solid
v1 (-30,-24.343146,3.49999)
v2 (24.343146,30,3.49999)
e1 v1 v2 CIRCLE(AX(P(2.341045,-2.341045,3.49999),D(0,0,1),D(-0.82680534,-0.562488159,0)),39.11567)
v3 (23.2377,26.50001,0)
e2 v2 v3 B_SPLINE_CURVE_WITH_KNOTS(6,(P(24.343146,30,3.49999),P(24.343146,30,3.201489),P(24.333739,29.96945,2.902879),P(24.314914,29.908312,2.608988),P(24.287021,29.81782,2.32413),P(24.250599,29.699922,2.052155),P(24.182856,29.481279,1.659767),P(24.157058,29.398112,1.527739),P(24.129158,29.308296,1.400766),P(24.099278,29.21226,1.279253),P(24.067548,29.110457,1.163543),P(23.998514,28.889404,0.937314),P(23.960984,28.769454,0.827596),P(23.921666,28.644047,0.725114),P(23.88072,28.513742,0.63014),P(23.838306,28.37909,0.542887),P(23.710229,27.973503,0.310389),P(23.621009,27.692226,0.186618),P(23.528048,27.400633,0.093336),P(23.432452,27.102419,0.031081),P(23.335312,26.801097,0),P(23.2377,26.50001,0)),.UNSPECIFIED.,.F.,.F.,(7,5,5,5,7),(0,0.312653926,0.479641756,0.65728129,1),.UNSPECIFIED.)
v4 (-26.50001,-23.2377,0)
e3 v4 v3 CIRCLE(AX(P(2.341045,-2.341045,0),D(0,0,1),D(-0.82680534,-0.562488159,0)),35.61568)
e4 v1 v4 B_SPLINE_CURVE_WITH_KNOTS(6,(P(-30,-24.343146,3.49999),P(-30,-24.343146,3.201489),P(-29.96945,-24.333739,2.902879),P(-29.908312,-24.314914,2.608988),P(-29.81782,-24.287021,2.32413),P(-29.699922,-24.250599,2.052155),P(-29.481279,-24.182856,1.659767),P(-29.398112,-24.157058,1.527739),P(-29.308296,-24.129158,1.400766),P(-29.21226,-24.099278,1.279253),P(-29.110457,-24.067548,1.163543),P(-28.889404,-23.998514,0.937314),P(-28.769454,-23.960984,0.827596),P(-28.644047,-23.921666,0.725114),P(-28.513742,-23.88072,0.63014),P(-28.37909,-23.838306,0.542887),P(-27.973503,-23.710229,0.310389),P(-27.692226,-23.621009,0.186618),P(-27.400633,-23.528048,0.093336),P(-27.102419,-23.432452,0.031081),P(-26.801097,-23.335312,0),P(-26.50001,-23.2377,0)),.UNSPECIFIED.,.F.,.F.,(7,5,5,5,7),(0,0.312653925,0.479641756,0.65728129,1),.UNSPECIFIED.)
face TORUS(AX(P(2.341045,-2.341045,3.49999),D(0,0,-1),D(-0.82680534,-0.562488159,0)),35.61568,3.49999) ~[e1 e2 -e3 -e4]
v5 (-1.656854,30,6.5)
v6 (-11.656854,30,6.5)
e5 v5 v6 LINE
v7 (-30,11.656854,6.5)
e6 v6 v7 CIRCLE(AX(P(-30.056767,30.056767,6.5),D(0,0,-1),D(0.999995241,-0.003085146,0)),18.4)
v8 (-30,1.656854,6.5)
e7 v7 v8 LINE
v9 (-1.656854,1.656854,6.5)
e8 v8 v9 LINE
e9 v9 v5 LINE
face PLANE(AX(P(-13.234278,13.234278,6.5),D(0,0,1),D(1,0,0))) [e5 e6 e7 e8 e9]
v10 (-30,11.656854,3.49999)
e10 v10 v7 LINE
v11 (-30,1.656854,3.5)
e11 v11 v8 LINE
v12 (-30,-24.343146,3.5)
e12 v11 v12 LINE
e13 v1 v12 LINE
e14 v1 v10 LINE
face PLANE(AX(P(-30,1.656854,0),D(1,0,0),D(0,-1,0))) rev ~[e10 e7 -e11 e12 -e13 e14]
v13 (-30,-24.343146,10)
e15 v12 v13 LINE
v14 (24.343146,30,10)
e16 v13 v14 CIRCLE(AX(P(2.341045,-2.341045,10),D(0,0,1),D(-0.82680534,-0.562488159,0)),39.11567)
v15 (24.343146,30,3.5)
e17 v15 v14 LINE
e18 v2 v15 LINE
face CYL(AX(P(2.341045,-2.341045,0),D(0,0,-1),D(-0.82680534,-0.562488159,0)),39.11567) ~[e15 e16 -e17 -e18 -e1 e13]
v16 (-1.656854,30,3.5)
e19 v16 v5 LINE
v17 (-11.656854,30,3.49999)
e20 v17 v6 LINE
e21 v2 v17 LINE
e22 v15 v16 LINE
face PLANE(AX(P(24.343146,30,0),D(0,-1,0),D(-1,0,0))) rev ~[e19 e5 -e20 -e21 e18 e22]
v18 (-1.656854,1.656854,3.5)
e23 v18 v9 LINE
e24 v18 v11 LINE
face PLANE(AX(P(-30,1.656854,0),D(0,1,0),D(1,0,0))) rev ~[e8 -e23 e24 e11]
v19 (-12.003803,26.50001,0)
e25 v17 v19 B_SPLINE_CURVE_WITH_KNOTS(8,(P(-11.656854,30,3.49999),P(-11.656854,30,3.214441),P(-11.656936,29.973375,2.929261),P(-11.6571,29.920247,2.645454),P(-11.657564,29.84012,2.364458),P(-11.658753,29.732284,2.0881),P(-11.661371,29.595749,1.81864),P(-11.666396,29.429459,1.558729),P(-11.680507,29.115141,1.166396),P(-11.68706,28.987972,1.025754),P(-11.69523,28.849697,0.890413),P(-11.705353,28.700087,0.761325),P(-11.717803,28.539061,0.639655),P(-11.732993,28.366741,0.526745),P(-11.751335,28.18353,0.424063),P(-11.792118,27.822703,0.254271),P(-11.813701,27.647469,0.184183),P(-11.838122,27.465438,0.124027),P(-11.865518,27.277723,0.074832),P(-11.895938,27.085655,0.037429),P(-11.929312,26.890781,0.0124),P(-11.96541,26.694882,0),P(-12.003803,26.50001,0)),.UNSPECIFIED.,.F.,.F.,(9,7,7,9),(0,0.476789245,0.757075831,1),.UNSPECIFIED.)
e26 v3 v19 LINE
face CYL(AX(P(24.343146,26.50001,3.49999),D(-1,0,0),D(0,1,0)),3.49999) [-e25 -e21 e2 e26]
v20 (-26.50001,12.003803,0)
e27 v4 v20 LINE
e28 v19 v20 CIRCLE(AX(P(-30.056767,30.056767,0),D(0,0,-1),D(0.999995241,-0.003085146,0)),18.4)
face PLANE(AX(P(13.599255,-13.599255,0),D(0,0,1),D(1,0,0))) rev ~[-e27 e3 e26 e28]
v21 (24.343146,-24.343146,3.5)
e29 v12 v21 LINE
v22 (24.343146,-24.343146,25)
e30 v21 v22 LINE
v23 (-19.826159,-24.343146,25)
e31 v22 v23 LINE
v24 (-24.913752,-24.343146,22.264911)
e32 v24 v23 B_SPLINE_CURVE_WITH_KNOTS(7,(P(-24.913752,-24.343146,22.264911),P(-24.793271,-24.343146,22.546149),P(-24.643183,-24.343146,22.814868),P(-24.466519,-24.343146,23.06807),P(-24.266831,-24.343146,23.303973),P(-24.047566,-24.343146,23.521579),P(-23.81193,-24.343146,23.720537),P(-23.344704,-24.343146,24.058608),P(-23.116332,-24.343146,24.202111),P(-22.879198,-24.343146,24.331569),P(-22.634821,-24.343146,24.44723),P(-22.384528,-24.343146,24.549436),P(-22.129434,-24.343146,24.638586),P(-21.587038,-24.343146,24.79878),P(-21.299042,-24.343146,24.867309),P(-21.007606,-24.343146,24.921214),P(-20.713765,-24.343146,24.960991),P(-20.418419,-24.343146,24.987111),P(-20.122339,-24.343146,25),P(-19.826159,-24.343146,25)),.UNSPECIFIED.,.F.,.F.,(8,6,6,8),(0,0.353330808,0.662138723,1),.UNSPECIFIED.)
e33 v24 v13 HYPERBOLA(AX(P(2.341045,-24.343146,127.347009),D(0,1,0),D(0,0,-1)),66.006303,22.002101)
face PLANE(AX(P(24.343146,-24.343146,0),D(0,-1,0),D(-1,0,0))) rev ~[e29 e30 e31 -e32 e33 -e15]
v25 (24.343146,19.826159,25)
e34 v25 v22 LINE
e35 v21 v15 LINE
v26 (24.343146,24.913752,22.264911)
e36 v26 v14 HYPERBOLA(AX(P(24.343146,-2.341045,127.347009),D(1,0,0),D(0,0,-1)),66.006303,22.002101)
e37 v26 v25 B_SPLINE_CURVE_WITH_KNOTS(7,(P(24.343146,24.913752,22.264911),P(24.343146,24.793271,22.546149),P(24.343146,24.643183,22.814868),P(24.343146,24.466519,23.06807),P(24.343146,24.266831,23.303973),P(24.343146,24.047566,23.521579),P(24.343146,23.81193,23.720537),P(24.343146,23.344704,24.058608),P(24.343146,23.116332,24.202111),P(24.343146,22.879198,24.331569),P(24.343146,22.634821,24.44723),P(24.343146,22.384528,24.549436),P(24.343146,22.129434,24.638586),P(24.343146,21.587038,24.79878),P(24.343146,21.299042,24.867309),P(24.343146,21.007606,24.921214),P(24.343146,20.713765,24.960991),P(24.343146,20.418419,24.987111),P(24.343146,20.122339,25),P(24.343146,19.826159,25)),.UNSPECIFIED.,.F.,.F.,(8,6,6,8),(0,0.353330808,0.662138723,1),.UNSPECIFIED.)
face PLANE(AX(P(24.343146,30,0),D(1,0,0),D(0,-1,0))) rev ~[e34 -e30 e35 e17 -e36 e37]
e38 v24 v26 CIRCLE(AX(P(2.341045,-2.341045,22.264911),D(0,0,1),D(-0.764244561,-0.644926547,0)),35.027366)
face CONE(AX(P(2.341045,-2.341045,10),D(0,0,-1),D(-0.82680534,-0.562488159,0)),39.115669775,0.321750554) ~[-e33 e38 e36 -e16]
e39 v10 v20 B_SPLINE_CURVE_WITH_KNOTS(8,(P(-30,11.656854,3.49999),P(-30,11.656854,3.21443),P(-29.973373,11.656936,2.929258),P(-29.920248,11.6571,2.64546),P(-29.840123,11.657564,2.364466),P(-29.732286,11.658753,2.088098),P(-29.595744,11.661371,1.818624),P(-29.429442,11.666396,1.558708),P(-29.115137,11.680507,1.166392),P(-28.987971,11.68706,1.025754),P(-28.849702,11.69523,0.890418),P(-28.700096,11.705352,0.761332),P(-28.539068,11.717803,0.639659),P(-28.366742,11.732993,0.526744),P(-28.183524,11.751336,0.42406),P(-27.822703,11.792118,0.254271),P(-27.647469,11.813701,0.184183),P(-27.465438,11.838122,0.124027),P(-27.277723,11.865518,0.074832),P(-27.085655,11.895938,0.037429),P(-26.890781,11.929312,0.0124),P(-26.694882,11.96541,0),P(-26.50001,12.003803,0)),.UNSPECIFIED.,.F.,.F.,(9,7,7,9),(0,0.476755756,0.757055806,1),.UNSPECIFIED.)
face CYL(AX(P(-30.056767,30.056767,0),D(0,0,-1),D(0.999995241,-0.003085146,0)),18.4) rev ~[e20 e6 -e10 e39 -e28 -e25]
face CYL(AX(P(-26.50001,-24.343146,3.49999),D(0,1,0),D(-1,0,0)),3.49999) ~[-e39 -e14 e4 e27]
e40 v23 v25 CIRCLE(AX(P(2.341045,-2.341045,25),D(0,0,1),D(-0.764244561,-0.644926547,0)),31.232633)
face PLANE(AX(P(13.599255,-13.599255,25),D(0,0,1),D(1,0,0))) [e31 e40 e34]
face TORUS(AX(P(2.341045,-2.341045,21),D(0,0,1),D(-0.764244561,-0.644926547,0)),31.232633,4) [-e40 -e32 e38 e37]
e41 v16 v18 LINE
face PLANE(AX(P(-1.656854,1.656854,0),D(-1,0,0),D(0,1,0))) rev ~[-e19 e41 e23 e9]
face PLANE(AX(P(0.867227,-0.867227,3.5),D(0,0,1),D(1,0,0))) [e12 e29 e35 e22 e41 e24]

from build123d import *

# Parameters (mm, degrees)
F1_DEPTH = 6.5
F2_DEPTH = 3.5
F3_DEPTH = 25
F4_R     = 3.49999
F5_SIZE2 = 15
F5_SIZE  = 5
F6_R     = 4


# Not quite as in the source:
# - a fillet or chamfer is up to 0.001 mm smaller than in the source, because OpenCascade refuses the exact size


with BuildPart() as f1:
    # F0 (on Top) → F1 (new body)
    with BuildSketch(Plane.XY):
        with BuildLine():
            Line((-1.6568542495, 1.6568542495), (-1.6568542495, 30))
            Line((-1.6568542495, 30), (-11.6568542495, 30))
            ThreePointArc((-11.6568542495, 30), (-17.0460019087, 17.0460019087), (-30, 11.6568542495))
            Line((-30, 11.6568542495), (-30, 1.6568542495))
            Line((-30, 1.6568542495), (-1.6568542495, 1.6568542495))
        make_face()
    extrude(amount=F1_DEPTH)

    # F0 (on Top) → F2 (join)
    with BuildSketch(Plane.XY):
        Polygon((24.3431457505, -24.3431457505), (24.3431457505, 30), (-1.6568542495, 30), (-1.6568542495, 1.6568542495), (-30, 1.6568542495), (-30, -24.3431457505), align=None)
    extrude(amount=F2_DEPTH)

    # F0 (on Top) → F3 (join)
    with BuildSketch(Plane.XY):
        with BuildLine():
            ThreePointArc((-30, -24.3431457505), (30, -30), (24.3431457505, 30))
            Line((24.3431457505, 30), (24.3431457505, -24.3431457505))
            Line((24.3431457505, -24.3431457505), (-30, -24.3431457505))
        make_face()
    extrude(amount=F3_DEPTH)

    # F4 (radius 3.5 in the source; OpenCascade refuses exactly that, so slightly less here)
    f4_edges = [f1.edges().sort_by_distance(p)[0] for p in [
        (30, -30, 0),
        (-30, -6.343146, 0),
        (6.343146, 30, 0),
    ]]
    fillet(f4_edges, radius=F4_R)

    # F5
    f5_edges = [f1.edges().sort_by_distance(p)[0] for p in [
        (30, -30, 25),
    ]]
    f5_side = f1.faces().sort_by_distance((29.285433, -29.285433, 25))[0]
    chamfer(f5_edges, length=F5_SIZE, length2=F5_SIZE2, reference=f5_side)

    # F6
    f6_edges = [f1.edges().sort_by_distance(p)[0] for p in [
        (26.464466, -26.464466, 25),
    ]]
    fillet(f6_edges, radius=F6_R)


solid = f1.part
